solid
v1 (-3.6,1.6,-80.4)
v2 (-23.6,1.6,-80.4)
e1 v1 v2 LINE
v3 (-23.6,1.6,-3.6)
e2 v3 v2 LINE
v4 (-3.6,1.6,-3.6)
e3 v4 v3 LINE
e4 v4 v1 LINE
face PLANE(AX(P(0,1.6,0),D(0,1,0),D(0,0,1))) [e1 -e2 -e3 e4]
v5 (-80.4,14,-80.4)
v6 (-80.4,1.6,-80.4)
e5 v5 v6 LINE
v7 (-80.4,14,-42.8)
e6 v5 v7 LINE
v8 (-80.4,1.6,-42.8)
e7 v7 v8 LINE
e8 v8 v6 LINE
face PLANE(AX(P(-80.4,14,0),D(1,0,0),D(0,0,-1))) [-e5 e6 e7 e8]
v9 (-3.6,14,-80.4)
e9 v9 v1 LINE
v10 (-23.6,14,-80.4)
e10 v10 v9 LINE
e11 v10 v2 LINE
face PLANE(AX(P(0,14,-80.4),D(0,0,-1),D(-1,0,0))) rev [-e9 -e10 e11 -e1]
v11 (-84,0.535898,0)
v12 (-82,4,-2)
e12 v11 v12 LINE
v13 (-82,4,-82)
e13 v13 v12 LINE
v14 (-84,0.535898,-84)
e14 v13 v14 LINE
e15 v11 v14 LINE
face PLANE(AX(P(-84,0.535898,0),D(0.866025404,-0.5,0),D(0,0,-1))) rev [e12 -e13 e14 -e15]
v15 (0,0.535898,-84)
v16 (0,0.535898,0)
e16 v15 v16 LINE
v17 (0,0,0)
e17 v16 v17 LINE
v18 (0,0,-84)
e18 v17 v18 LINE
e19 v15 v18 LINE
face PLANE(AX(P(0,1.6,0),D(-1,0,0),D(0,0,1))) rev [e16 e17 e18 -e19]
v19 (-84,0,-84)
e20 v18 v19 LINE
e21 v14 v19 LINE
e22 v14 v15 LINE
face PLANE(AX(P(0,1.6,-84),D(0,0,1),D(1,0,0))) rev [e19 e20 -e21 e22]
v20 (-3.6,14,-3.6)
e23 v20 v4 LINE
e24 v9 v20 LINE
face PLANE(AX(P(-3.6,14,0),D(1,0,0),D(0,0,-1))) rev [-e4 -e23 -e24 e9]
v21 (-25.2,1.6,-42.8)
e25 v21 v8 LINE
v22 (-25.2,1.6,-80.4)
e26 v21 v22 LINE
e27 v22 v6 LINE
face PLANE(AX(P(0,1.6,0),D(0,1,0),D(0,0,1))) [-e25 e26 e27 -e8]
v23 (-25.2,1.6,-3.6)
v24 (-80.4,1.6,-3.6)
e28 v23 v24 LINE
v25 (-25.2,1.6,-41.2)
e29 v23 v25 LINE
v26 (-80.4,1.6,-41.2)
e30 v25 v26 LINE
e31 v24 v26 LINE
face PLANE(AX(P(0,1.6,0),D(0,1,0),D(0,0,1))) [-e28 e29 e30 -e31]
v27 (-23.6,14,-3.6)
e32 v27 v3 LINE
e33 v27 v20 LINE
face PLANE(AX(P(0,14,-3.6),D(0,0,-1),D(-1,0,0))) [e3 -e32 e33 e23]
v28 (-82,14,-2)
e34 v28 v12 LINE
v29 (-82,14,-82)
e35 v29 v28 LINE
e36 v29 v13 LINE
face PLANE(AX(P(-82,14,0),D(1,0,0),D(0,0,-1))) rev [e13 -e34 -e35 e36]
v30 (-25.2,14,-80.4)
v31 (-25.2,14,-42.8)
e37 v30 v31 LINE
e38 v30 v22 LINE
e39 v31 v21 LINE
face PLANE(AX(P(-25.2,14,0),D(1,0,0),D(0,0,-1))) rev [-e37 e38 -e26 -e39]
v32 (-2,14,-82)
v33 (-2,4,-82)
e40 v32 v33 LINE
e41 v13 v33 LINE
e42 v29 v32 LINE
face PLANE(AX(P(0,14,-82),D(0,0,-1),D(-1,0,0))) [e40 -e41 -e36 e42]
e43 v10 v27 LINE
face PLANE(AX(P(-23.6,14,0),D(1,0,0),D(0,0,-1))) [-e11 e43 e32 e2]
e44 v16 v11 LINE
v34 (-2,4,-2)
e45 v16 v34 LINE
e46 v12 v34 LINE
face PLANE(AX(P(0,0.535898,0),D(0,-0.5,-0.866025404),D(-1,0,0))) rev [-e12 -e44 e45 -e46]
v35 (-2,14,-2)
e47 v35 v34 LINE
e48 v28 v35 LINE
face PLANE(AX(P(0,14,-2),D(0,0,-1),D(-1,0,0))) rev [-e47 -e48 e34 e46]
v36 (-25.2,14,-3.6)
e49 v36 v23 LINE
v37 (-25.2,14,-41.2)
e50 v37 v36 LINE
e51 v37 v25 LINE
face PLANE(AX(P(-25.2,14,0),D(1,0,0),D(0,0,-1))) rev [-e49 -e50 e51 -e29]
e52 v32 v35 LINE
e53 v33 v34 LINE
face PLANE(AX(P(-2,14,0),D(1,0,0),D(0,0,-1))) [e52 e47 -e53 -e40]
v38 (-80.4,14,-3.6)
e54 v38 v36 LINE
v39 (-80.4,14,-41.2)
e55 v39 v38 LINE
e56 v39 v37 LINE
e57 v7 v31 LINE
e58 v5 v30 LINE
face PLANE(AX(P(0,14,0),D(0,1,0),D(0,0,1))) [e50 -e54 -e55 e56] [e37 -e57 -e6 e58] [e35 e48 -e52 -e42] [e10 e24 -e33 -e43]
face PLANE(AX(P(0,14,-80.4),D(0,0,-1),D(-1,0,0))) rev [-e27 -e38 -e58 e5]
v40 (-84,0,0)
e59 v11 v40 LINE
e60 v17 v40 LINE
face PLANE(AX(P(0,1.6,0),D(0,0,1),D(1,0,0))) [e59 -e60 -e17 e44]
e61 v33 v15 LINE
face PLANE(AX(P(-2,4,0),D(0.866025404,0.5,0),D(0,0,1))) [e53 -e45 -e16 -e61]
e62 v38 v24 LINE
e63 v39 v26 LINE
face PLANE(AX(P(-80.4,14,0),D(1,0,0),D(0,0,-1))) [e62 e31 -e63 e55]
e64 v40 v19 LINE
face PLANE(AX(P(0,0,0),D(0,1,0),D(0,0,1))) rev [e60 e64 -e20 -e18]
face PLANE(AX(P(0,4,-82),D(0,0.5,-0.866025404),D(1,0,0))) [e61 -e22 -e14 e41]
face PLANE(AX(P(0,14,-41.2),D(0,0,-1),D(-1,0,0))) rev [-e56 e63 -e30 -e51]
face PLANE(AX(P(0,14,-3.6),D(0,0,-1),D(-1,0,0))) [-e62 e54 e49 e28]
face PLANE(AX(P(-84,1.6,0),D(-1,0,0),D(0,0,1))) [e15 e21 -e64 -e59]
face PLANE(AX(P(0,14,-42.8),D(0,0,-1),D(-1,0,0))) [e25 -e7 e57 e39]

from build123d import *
from OCP.BRepFilletAPI import BRepFilletAPI_MakeChamfer

# Parameters (mm, degrees)
SKICA1_W                = 84
SKICA1_H                = 84
P_IDAT_VYSUNUT_M1_DEPTH = 1.6
SKICA1_3_W              = 80
SKICA1_3_H              = 80
SKICA1_3_W_2            = 20
SKICA1_3_H_2            = 76.8
SKICA1_3_W_3            = 55.2
SKICA1_3_H_3            = 37.6
P_IDAT_VYSUNUT_M2_DEPTH = 14
SKICA1_4_W              = 84
SKICA1_4_H              = 84
SKICA1_4_W_2            = 80
SKICA1_4_H_2            = 80
P_IDAT_VYSUNUT_M3_DEPTH = 4
ZKOSEN_2_SIZE           = 3.464101615
ZKOSEN_2_SIZE_2         = 2


with BuildPart() as part:
    # Skica1 → Přidat vysunutím1 (new body)
    with BuildSketch(Plane(origin=(0, 0, 0), x_dir=(1, 0, 0), z_dir=(0, 1, 0))):
        with Locations((-42, 42)):
            Rectangle(SKICA1_W, SKICA1_H)
    extrude(amount=P_IDAT_VYSUNUT_M1_DEPTH)

    # Skica1<3> → Přidat vysunutím2 (add)
    with BuildSketch(Plane(origin=(0, 0, 0), x_dir=(1, 0, 0), z_dir=(0, 1, 0))):
        with Locations((-42, 42)):
            Rectangle(SKICA1_3_W, SKICA1_3_H)
        with Locations((-13.6, 42)):
            Rectangle(SKICA1_3_W_2, SKICA1_3_H_2, mode=Mode.SUBTRACT)
        with Locations((-52.8, 61.6)):
            Rectangle(SKICA1_3_W_3, SKICA1_3_H_3, mode=Mode.SUBTRACT)
        with Locations((-52.8, 22.4)):
            Rectangle(SKICA1_3_W_3, SKICA1_3_H_3, mode=Mode.SUBTRACT)
    extrude(amount=P_IDAT_VYSUNUT_M2_DEPTH)

    # Skica1<4> → Přidat vysunutím3 (add)
    with BuildSketch(Plane(origin=(0, 0, 0), x_dir=(1, 0, 0), z_dir=(0, 1, 0))):
        with Locations((-42, 42)):
            Rectangle(SKICA1_4_W, SKICA1_4_H)
        with Locations((-42, 42)):
            Rectangle(SKICA1_4_W_2, SKICA1_4_H_2, mode=Mode.SUBTRACT)
    extrude(amount=P_IDAT_VYSUNUT_M3_DEPTH)

    # Zkosení2
    zkosen_2_edges_1 = [part.edges().sort_by_distance(p)[0] for p in [
        (-84, 4, -42),
    ]]
    zkosen_2_side_1 = [part.faces().sort_by_distance(p)[0] for p in [
        (-84, 3.96, -42),
    ]]
    zkosen_2_edges_2 = [part.edges().sort_by_distance(p)[0] for p in [
        (-42, 4, 0),
    ]]
    zkosen_2_side_2 = [part.faces().sort_by_distance(p)[0] for p in [
        (-42, 3.96, 0),
    ]]
    zkosen_2_edges_3 = [part.edges().sort_by_distance(p)[0] for p in [
        (0, 4, -42),
    ]]
    zkosen_2_side_3 = [part.faces().sort_by_distance(p)[0] for p in [
        (-0.04, 4, -42),
    ]]
    zkosen_2_edges_4 = [part.edges().sort_by_distance(p)[0] for p in [
        (-42, 4, -84),
    ]]
    zkosen_2_side_4 = [part.faces().sort_by_distance(p)[0] for p in [
        (-42, 3.96, -84),
    ]]
    zkosen_2 = BRepFilletAPI_MakeChamfer(part.part.solid().wrapped)
    for e in zkosen_2_edges_1:
        zkosen_2.Add(ZKOSEN_2_SIZE - 0.0001, ZKOSEN_2_SIZE_2 - 0.0001, e.wrapped, zkosen_2_side_1[0].wrapped)
    for e in zkosen_2_edges_2:
        zkosen_2.Add(ZKOSEN_2_SIZE - 0.0001, ZKOSEN_2_SIZE_2 - 0.0001, e.wrapped, zkosen_2_side_2[0].wrapped)
    for e in zkosen_2_edges_3:
        zkosen_2.Add(ZKOSEN_2_SIZE_2 - 0.0001, ZKOSEN_2_SIZE - 0.0001, e.wrapped, zkosen_2_side_3[0].wrapped)
    for e in zkosen_2_edges_4:
        zkosen_2.Add(ZKOSEN_2_SIZE - 0.0001, ZKOSEN_2_SIZE_2 - 0.0001, e.wrapped, zkosen_2_side_4[0].wrapped)
    add(Compound.cast(zkosen_2.Shape()), mode=Mode.REPLACE)  # a hair under: the kernel refuses the full size


solid = part.part
